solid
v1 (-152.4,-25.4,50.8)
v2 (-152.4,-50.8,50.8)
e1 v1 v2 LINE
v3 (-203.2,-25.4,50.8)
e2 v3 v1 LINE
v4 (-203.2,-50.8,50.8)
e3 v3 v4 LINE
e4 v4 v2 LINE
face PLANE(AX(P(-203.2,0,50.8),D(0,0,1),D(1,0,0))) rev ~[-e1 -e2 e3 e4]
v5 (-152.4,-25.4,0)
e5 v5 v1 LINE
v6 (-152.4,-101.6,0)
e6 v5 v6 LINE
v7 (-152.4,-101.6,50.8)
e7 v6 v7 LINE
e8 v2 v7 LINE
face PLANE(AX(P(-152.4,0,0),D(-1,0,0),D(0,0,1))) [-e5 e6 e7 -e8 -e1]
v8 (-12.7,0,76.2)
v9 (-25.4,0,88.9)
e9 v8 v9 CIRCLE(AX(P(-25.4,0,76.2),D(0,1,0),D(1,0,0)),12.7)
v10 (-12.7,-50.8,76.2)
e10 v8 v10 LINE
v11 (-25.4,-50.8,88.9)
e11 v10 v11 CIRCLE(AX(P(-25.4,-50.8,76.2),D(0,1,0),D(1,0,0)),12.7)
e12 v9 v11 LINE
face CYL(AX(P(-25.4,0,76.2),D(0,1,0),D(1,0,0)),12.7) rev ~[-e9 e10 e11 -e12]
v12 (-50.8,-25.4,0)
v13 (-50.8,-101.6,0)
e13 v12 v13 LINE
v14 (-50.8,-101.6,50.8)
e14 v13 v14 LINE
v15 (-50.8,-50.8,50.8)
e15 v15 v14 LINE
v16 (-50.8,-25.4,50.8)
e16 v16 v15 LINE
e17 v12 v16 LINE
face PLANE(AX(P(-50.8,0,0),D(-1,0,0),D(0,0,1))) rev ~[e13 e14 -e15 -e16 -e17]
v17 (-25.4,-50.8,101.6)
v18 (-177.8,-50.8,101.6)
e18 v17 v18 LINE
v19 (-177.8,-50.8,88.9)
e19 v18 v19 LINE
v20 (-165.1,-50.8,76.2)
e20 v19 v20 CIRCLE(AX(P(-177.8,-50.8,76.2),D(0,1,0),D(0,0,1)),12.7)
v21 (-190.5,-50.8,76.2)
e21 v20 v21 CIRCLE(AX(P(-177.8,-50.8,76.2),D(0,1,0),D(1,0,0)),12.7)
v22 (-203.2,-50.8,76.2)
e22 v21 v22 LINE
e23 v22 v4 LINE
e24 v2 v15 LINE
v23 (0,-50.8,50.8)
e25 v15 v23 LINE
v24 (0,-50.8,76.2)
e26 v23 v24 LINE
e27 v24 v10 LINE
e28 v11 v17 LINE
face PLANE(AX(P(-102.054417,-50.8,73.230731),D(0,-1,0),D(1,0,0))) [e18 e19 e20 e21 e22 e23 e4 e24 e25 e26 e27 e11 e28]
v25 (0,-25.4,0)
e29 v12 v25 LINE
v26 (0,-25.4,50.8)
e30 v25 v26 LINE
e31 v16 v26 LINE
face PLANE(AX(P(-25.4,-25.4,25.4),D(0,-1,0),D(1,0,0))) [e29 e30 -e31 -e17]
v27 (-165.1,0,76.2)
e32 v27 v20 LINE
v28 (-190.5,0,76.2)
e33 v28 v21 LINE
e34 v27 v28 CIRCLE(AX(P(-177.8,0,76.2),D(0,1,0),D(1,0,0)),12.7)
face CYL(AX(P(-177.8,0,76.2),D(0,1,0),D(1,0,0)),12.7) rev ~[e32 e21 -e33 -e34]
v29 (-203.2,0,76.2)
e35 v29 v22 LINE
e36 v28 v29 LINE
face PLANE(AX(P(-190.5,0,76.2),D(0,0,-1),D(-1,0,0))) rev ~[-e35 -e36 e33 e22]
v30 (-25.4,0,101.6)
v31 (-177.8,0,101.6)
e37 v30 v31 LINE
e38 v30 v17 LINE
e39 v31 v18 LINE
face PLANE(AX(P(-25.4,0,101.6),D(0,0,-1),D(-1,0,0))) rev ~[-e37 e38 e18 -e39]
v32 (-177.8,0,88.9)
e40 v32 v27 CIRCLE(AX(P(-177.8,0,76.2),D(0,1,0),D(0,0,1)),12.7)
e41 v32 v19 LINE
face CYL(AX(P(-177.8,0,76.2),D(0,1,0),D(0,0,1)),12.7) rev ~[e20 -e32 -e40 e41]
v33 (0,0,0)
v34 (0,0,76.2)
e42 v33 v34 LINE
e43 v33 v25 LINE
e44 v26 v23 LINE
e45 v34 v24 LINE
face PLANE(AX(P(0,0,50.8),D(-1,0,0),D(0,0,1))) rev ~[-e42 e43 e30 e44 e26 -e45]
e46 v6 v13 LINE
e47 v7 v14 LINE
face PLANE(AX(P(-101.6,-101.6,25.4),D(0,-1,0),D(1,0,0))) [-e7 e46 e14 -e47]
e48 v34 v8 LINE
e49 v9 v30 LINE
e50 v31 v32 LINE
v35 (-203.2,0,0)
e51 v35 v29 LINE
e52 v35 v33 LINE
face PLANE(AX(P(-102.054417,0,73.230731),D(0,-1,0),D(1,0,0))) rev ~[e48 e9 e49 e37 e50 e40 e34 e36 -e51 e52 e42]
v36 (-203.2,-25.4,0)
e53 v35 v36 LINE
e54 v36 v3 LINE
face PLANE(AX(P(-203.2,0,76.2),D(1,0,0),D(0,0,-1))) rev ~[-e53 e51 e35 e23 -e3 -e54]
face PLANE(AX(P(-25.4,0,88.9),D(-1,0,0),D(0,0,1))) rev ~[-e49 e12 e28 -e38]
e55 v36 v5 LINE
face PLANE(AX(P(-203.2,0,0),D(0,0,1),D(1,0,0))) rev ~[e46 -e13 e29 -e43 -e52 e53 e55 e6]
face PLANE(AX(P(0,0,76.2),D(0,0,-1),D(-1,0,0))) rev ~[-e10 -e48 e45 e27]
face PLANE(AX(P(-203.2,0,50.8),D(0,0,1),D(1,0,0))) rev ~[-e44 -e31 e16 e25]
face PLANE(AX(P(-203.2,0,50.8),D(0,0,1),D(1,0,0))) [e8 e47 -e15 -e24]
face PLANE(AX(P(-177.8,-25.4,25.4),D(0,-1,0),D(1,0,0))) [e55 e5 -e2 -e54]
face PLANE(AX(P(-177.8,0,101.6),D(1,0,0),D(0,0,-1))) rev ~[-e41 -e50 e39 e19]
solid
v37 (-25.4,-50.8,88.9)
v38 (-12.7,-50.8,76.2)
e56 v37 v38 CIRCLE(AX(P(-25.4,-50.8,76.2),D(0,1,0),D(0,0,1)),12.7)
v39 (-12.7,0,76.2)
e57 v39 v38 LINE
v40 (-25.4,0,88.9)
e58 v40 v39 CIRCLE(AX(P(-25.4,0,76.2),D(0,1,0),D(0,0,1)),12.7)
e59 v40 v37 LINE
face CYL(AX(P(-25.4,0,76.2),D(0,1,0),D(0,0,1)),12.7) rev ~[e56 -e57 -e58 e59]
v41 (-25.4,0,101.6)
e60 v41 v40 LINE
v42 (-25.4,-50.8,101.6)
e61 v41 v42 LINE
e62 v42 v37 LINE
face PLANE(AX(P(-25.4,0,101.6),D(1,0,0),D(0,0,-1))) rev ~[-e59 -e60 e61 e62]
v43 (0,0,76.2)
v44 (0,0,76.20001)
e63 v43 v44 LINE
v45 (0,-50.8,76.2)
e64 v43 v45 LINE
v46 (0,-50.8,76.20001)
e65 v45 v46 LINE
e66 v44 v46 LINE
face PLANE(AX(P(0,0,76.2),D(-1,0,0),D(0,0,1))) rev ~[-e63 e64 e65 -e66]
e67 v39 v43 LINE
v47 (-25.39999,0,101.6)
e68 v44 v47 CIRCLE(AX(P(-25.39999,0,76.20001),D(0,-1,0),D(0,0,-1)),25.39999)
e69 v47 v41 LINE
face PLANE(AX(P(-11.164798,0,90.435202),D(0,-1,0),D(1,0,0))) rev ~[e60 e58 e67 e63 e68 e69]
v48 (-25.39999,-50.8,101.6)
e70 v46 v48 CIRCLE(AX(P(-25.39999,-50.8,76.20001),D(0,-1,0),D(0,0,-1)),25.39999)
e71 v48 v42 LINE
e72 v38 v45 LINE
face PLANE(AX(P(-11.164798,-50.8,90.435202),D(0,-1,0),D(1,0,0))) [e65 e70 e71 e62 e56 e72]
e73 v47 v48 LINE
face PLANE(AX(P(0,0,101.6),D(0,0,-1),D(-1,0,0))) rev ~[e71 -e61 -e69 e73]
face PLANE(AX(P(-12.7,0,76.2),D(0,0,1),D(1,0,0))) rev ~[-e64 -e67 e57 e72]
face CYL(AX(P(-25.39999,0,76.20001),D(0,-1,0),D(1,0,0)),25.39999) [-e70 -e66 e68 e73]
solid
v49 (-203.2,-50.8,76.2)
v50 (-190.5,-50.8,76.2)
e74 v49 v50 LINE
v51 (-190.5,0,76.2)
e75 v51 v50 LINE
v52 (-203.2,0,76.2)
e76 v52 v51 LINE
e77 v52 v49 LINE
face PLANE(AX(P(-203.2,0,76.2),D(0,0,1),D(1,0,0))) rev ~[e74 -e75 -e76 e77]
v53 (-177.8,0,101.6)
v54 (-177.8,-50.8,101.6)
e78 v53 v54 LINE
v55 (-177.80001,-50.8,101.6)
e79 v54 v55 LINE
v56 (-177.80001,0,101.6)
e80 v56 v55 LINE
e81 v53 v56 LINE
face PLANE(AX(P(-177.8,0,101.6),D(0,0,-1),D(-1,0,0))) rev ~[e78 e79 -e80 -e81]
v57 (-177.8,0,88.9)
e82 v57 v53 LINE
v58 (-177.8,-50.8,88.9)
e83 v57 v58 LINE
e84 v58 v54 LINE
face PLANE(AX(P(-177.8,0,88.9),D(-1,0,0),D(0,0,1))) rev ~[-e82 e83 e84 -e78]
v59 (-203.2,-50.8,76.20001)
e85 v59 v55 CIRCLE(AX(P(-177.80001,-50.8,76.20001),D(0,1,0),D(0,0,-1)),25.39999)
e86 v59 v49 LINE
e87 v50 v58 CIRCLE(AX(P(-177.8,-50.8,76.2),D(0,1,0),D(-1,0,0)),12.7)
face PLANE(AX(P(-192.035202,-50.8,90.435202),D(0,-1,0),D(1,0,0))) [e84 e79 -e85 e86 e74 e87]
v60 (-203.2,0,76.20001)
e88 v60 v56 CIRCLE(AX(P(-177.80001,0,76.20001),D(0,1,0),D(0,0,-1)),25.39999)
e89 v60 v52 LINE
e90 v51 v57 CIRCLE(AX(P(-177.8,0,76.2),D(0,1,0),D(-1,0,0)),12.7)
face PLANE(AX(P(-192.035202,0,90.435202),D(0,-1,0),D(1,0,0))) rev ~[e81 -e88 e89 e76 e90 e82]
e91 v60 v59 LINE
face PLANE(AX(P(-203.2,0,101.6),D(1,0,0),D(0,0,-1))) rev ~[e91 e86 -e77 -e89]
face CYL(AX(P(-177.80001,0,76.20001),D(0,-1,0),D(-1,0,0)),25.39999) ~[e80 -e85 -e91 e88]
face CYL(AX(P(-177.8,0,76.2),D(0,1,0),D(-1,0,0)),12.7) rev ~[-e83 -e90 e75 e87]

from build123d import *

# Parameters (mm, degrees)
F0_W     = 101.6
F0_H     = 50.8
F1_DEPTH = 101.6
F0_W_2   = 50.8
F2_DEPTH = 25.4
F3_DEPTH = 50.8
F4_DEPTH = 50.8
F5_R     = 25.39999
F5_2_R   = 25.39999


# Not quite as in the source:
# - a fillet or chamfer is up to 0.001 mm smaller than in the source, because OpenCascade refuses the exact size


with BuildPart() as f1:
    # F0 (on Front) → F1 (new body)
    with BuildSketch(Plane.XZ):
        with Locations((-101.6, 25.4)):
            Rectangle(F0_W, F0_H)
    extrude(amount=F1_DEPTH)

    # F0 (on Front) → F2 (join)
    with BuildSketch(Plane.XZ):
        with Locations((-177.8, 25.4)):
            Rectangle(F0_W_2, F0_H)
        with Locations((-25.4, 25.4)):
            Rectangle(F0_W_2, F0_H)
    extrude(amount=F2_DEPTH)

    # F0 (on Front) → F3 (join)
    with BuildSketch(Plane.XZ):
        with BuildLine():
            Line((-50.8, 50.8), (0, 50.8))
            Line((0, 50.8), (0, 76.2))
            Line((0, 76.2), (-12.7, 76.2))
            ThreePointArc((-12.7, 76.2), (-34.3802561211, 67.2197438789), (-25.4, 88.9))
            Line((-25.4, 88.9), (-25.4, 101.6))
            Line((-25.4, 101.6), (-177.8, 101.6))
            Line((-177.8, 101.6), (-177.8, 88.9))
            ThreePointArc((-177.8, 88.9), (-168.8197438789, 85.1802561211), (-165.1, 76.2))
            ThreePointArc((-165.1, 76.2), (-177.8, 63.5), (-190.5, 76.2))
            Line((-190.5, 76.2), (-203.2, 76.2))
            Line((-203.2, 76.2), (-203.2, 50.8))
            Line((-203.2, 50.8), (-152.4, 50.8))
            Line((-152.4, 50.8), (-50.8, 50.8))
        make_face()
    extrude(amount=F3_DEPTH)


with BuildPart() as f4:
    # F0 (on Front) → F4 (new body)
    with BuildSketch(Plane.XZ):
        with BuildLine():
            Line((-12.7, 76.2), (0, 76.2))
            Line((0, 76.2), (0, 101.6))
            Line((0, 101.6), (-25.4, 101.6))
            Line((-25.4, 101.6), (-25.4, 88.9))
            ThreePointArc((-25.4, 88.9), (-16.4197438789, 85.1802561211), (-12.7, 76.2))
        make_face()
    extrude(amount=F4_DEPTH)

    # F5 (radius 25.4 in the source; OpenCascade refuses exactly that, so slightly less here)
    f5_edges = [f4.edges().sort_by_distance(p)[0] for p in [
        (0, -25.4, 101.6),
    ]]
    fillet(f5_edges, radius=F5_R)


with BuildPart() as f4b:
    # F0 (on Front) → F4, piece 2 (new body)
    with BuildSketch(Plane.XZ):
        with BuildLine():
            Line((-203.2, 101.6), (-203.2, 76.2))
            Line((-203.2, 76.2), (-190.5, 76.2))
            ThreePointArc((-190.5, 76.2), (-186.7802561211, 85.1802561211), (-177.8, 88.9))
            Line((-177.8, 88.9), (-177.8, 101.6))
            Line((-177.8, 101.6), (-203.2, 101.6))
        make_face()
    extrude(amount=F4_DEPTH)

    # F5#2 (radius 25.4 in the source; OpenCascade refuses exactly that, so slightly less here)
    f5_2_edges = [f4b.edges().sort_by_distance(p)[0] for p in [
        (-203.2, -25.4, 101.6),
    ]]
    fillet(f5_2_edges, radius=F5_2_R)


solid = Compound([f1.part, f4.part, f4b.part])
